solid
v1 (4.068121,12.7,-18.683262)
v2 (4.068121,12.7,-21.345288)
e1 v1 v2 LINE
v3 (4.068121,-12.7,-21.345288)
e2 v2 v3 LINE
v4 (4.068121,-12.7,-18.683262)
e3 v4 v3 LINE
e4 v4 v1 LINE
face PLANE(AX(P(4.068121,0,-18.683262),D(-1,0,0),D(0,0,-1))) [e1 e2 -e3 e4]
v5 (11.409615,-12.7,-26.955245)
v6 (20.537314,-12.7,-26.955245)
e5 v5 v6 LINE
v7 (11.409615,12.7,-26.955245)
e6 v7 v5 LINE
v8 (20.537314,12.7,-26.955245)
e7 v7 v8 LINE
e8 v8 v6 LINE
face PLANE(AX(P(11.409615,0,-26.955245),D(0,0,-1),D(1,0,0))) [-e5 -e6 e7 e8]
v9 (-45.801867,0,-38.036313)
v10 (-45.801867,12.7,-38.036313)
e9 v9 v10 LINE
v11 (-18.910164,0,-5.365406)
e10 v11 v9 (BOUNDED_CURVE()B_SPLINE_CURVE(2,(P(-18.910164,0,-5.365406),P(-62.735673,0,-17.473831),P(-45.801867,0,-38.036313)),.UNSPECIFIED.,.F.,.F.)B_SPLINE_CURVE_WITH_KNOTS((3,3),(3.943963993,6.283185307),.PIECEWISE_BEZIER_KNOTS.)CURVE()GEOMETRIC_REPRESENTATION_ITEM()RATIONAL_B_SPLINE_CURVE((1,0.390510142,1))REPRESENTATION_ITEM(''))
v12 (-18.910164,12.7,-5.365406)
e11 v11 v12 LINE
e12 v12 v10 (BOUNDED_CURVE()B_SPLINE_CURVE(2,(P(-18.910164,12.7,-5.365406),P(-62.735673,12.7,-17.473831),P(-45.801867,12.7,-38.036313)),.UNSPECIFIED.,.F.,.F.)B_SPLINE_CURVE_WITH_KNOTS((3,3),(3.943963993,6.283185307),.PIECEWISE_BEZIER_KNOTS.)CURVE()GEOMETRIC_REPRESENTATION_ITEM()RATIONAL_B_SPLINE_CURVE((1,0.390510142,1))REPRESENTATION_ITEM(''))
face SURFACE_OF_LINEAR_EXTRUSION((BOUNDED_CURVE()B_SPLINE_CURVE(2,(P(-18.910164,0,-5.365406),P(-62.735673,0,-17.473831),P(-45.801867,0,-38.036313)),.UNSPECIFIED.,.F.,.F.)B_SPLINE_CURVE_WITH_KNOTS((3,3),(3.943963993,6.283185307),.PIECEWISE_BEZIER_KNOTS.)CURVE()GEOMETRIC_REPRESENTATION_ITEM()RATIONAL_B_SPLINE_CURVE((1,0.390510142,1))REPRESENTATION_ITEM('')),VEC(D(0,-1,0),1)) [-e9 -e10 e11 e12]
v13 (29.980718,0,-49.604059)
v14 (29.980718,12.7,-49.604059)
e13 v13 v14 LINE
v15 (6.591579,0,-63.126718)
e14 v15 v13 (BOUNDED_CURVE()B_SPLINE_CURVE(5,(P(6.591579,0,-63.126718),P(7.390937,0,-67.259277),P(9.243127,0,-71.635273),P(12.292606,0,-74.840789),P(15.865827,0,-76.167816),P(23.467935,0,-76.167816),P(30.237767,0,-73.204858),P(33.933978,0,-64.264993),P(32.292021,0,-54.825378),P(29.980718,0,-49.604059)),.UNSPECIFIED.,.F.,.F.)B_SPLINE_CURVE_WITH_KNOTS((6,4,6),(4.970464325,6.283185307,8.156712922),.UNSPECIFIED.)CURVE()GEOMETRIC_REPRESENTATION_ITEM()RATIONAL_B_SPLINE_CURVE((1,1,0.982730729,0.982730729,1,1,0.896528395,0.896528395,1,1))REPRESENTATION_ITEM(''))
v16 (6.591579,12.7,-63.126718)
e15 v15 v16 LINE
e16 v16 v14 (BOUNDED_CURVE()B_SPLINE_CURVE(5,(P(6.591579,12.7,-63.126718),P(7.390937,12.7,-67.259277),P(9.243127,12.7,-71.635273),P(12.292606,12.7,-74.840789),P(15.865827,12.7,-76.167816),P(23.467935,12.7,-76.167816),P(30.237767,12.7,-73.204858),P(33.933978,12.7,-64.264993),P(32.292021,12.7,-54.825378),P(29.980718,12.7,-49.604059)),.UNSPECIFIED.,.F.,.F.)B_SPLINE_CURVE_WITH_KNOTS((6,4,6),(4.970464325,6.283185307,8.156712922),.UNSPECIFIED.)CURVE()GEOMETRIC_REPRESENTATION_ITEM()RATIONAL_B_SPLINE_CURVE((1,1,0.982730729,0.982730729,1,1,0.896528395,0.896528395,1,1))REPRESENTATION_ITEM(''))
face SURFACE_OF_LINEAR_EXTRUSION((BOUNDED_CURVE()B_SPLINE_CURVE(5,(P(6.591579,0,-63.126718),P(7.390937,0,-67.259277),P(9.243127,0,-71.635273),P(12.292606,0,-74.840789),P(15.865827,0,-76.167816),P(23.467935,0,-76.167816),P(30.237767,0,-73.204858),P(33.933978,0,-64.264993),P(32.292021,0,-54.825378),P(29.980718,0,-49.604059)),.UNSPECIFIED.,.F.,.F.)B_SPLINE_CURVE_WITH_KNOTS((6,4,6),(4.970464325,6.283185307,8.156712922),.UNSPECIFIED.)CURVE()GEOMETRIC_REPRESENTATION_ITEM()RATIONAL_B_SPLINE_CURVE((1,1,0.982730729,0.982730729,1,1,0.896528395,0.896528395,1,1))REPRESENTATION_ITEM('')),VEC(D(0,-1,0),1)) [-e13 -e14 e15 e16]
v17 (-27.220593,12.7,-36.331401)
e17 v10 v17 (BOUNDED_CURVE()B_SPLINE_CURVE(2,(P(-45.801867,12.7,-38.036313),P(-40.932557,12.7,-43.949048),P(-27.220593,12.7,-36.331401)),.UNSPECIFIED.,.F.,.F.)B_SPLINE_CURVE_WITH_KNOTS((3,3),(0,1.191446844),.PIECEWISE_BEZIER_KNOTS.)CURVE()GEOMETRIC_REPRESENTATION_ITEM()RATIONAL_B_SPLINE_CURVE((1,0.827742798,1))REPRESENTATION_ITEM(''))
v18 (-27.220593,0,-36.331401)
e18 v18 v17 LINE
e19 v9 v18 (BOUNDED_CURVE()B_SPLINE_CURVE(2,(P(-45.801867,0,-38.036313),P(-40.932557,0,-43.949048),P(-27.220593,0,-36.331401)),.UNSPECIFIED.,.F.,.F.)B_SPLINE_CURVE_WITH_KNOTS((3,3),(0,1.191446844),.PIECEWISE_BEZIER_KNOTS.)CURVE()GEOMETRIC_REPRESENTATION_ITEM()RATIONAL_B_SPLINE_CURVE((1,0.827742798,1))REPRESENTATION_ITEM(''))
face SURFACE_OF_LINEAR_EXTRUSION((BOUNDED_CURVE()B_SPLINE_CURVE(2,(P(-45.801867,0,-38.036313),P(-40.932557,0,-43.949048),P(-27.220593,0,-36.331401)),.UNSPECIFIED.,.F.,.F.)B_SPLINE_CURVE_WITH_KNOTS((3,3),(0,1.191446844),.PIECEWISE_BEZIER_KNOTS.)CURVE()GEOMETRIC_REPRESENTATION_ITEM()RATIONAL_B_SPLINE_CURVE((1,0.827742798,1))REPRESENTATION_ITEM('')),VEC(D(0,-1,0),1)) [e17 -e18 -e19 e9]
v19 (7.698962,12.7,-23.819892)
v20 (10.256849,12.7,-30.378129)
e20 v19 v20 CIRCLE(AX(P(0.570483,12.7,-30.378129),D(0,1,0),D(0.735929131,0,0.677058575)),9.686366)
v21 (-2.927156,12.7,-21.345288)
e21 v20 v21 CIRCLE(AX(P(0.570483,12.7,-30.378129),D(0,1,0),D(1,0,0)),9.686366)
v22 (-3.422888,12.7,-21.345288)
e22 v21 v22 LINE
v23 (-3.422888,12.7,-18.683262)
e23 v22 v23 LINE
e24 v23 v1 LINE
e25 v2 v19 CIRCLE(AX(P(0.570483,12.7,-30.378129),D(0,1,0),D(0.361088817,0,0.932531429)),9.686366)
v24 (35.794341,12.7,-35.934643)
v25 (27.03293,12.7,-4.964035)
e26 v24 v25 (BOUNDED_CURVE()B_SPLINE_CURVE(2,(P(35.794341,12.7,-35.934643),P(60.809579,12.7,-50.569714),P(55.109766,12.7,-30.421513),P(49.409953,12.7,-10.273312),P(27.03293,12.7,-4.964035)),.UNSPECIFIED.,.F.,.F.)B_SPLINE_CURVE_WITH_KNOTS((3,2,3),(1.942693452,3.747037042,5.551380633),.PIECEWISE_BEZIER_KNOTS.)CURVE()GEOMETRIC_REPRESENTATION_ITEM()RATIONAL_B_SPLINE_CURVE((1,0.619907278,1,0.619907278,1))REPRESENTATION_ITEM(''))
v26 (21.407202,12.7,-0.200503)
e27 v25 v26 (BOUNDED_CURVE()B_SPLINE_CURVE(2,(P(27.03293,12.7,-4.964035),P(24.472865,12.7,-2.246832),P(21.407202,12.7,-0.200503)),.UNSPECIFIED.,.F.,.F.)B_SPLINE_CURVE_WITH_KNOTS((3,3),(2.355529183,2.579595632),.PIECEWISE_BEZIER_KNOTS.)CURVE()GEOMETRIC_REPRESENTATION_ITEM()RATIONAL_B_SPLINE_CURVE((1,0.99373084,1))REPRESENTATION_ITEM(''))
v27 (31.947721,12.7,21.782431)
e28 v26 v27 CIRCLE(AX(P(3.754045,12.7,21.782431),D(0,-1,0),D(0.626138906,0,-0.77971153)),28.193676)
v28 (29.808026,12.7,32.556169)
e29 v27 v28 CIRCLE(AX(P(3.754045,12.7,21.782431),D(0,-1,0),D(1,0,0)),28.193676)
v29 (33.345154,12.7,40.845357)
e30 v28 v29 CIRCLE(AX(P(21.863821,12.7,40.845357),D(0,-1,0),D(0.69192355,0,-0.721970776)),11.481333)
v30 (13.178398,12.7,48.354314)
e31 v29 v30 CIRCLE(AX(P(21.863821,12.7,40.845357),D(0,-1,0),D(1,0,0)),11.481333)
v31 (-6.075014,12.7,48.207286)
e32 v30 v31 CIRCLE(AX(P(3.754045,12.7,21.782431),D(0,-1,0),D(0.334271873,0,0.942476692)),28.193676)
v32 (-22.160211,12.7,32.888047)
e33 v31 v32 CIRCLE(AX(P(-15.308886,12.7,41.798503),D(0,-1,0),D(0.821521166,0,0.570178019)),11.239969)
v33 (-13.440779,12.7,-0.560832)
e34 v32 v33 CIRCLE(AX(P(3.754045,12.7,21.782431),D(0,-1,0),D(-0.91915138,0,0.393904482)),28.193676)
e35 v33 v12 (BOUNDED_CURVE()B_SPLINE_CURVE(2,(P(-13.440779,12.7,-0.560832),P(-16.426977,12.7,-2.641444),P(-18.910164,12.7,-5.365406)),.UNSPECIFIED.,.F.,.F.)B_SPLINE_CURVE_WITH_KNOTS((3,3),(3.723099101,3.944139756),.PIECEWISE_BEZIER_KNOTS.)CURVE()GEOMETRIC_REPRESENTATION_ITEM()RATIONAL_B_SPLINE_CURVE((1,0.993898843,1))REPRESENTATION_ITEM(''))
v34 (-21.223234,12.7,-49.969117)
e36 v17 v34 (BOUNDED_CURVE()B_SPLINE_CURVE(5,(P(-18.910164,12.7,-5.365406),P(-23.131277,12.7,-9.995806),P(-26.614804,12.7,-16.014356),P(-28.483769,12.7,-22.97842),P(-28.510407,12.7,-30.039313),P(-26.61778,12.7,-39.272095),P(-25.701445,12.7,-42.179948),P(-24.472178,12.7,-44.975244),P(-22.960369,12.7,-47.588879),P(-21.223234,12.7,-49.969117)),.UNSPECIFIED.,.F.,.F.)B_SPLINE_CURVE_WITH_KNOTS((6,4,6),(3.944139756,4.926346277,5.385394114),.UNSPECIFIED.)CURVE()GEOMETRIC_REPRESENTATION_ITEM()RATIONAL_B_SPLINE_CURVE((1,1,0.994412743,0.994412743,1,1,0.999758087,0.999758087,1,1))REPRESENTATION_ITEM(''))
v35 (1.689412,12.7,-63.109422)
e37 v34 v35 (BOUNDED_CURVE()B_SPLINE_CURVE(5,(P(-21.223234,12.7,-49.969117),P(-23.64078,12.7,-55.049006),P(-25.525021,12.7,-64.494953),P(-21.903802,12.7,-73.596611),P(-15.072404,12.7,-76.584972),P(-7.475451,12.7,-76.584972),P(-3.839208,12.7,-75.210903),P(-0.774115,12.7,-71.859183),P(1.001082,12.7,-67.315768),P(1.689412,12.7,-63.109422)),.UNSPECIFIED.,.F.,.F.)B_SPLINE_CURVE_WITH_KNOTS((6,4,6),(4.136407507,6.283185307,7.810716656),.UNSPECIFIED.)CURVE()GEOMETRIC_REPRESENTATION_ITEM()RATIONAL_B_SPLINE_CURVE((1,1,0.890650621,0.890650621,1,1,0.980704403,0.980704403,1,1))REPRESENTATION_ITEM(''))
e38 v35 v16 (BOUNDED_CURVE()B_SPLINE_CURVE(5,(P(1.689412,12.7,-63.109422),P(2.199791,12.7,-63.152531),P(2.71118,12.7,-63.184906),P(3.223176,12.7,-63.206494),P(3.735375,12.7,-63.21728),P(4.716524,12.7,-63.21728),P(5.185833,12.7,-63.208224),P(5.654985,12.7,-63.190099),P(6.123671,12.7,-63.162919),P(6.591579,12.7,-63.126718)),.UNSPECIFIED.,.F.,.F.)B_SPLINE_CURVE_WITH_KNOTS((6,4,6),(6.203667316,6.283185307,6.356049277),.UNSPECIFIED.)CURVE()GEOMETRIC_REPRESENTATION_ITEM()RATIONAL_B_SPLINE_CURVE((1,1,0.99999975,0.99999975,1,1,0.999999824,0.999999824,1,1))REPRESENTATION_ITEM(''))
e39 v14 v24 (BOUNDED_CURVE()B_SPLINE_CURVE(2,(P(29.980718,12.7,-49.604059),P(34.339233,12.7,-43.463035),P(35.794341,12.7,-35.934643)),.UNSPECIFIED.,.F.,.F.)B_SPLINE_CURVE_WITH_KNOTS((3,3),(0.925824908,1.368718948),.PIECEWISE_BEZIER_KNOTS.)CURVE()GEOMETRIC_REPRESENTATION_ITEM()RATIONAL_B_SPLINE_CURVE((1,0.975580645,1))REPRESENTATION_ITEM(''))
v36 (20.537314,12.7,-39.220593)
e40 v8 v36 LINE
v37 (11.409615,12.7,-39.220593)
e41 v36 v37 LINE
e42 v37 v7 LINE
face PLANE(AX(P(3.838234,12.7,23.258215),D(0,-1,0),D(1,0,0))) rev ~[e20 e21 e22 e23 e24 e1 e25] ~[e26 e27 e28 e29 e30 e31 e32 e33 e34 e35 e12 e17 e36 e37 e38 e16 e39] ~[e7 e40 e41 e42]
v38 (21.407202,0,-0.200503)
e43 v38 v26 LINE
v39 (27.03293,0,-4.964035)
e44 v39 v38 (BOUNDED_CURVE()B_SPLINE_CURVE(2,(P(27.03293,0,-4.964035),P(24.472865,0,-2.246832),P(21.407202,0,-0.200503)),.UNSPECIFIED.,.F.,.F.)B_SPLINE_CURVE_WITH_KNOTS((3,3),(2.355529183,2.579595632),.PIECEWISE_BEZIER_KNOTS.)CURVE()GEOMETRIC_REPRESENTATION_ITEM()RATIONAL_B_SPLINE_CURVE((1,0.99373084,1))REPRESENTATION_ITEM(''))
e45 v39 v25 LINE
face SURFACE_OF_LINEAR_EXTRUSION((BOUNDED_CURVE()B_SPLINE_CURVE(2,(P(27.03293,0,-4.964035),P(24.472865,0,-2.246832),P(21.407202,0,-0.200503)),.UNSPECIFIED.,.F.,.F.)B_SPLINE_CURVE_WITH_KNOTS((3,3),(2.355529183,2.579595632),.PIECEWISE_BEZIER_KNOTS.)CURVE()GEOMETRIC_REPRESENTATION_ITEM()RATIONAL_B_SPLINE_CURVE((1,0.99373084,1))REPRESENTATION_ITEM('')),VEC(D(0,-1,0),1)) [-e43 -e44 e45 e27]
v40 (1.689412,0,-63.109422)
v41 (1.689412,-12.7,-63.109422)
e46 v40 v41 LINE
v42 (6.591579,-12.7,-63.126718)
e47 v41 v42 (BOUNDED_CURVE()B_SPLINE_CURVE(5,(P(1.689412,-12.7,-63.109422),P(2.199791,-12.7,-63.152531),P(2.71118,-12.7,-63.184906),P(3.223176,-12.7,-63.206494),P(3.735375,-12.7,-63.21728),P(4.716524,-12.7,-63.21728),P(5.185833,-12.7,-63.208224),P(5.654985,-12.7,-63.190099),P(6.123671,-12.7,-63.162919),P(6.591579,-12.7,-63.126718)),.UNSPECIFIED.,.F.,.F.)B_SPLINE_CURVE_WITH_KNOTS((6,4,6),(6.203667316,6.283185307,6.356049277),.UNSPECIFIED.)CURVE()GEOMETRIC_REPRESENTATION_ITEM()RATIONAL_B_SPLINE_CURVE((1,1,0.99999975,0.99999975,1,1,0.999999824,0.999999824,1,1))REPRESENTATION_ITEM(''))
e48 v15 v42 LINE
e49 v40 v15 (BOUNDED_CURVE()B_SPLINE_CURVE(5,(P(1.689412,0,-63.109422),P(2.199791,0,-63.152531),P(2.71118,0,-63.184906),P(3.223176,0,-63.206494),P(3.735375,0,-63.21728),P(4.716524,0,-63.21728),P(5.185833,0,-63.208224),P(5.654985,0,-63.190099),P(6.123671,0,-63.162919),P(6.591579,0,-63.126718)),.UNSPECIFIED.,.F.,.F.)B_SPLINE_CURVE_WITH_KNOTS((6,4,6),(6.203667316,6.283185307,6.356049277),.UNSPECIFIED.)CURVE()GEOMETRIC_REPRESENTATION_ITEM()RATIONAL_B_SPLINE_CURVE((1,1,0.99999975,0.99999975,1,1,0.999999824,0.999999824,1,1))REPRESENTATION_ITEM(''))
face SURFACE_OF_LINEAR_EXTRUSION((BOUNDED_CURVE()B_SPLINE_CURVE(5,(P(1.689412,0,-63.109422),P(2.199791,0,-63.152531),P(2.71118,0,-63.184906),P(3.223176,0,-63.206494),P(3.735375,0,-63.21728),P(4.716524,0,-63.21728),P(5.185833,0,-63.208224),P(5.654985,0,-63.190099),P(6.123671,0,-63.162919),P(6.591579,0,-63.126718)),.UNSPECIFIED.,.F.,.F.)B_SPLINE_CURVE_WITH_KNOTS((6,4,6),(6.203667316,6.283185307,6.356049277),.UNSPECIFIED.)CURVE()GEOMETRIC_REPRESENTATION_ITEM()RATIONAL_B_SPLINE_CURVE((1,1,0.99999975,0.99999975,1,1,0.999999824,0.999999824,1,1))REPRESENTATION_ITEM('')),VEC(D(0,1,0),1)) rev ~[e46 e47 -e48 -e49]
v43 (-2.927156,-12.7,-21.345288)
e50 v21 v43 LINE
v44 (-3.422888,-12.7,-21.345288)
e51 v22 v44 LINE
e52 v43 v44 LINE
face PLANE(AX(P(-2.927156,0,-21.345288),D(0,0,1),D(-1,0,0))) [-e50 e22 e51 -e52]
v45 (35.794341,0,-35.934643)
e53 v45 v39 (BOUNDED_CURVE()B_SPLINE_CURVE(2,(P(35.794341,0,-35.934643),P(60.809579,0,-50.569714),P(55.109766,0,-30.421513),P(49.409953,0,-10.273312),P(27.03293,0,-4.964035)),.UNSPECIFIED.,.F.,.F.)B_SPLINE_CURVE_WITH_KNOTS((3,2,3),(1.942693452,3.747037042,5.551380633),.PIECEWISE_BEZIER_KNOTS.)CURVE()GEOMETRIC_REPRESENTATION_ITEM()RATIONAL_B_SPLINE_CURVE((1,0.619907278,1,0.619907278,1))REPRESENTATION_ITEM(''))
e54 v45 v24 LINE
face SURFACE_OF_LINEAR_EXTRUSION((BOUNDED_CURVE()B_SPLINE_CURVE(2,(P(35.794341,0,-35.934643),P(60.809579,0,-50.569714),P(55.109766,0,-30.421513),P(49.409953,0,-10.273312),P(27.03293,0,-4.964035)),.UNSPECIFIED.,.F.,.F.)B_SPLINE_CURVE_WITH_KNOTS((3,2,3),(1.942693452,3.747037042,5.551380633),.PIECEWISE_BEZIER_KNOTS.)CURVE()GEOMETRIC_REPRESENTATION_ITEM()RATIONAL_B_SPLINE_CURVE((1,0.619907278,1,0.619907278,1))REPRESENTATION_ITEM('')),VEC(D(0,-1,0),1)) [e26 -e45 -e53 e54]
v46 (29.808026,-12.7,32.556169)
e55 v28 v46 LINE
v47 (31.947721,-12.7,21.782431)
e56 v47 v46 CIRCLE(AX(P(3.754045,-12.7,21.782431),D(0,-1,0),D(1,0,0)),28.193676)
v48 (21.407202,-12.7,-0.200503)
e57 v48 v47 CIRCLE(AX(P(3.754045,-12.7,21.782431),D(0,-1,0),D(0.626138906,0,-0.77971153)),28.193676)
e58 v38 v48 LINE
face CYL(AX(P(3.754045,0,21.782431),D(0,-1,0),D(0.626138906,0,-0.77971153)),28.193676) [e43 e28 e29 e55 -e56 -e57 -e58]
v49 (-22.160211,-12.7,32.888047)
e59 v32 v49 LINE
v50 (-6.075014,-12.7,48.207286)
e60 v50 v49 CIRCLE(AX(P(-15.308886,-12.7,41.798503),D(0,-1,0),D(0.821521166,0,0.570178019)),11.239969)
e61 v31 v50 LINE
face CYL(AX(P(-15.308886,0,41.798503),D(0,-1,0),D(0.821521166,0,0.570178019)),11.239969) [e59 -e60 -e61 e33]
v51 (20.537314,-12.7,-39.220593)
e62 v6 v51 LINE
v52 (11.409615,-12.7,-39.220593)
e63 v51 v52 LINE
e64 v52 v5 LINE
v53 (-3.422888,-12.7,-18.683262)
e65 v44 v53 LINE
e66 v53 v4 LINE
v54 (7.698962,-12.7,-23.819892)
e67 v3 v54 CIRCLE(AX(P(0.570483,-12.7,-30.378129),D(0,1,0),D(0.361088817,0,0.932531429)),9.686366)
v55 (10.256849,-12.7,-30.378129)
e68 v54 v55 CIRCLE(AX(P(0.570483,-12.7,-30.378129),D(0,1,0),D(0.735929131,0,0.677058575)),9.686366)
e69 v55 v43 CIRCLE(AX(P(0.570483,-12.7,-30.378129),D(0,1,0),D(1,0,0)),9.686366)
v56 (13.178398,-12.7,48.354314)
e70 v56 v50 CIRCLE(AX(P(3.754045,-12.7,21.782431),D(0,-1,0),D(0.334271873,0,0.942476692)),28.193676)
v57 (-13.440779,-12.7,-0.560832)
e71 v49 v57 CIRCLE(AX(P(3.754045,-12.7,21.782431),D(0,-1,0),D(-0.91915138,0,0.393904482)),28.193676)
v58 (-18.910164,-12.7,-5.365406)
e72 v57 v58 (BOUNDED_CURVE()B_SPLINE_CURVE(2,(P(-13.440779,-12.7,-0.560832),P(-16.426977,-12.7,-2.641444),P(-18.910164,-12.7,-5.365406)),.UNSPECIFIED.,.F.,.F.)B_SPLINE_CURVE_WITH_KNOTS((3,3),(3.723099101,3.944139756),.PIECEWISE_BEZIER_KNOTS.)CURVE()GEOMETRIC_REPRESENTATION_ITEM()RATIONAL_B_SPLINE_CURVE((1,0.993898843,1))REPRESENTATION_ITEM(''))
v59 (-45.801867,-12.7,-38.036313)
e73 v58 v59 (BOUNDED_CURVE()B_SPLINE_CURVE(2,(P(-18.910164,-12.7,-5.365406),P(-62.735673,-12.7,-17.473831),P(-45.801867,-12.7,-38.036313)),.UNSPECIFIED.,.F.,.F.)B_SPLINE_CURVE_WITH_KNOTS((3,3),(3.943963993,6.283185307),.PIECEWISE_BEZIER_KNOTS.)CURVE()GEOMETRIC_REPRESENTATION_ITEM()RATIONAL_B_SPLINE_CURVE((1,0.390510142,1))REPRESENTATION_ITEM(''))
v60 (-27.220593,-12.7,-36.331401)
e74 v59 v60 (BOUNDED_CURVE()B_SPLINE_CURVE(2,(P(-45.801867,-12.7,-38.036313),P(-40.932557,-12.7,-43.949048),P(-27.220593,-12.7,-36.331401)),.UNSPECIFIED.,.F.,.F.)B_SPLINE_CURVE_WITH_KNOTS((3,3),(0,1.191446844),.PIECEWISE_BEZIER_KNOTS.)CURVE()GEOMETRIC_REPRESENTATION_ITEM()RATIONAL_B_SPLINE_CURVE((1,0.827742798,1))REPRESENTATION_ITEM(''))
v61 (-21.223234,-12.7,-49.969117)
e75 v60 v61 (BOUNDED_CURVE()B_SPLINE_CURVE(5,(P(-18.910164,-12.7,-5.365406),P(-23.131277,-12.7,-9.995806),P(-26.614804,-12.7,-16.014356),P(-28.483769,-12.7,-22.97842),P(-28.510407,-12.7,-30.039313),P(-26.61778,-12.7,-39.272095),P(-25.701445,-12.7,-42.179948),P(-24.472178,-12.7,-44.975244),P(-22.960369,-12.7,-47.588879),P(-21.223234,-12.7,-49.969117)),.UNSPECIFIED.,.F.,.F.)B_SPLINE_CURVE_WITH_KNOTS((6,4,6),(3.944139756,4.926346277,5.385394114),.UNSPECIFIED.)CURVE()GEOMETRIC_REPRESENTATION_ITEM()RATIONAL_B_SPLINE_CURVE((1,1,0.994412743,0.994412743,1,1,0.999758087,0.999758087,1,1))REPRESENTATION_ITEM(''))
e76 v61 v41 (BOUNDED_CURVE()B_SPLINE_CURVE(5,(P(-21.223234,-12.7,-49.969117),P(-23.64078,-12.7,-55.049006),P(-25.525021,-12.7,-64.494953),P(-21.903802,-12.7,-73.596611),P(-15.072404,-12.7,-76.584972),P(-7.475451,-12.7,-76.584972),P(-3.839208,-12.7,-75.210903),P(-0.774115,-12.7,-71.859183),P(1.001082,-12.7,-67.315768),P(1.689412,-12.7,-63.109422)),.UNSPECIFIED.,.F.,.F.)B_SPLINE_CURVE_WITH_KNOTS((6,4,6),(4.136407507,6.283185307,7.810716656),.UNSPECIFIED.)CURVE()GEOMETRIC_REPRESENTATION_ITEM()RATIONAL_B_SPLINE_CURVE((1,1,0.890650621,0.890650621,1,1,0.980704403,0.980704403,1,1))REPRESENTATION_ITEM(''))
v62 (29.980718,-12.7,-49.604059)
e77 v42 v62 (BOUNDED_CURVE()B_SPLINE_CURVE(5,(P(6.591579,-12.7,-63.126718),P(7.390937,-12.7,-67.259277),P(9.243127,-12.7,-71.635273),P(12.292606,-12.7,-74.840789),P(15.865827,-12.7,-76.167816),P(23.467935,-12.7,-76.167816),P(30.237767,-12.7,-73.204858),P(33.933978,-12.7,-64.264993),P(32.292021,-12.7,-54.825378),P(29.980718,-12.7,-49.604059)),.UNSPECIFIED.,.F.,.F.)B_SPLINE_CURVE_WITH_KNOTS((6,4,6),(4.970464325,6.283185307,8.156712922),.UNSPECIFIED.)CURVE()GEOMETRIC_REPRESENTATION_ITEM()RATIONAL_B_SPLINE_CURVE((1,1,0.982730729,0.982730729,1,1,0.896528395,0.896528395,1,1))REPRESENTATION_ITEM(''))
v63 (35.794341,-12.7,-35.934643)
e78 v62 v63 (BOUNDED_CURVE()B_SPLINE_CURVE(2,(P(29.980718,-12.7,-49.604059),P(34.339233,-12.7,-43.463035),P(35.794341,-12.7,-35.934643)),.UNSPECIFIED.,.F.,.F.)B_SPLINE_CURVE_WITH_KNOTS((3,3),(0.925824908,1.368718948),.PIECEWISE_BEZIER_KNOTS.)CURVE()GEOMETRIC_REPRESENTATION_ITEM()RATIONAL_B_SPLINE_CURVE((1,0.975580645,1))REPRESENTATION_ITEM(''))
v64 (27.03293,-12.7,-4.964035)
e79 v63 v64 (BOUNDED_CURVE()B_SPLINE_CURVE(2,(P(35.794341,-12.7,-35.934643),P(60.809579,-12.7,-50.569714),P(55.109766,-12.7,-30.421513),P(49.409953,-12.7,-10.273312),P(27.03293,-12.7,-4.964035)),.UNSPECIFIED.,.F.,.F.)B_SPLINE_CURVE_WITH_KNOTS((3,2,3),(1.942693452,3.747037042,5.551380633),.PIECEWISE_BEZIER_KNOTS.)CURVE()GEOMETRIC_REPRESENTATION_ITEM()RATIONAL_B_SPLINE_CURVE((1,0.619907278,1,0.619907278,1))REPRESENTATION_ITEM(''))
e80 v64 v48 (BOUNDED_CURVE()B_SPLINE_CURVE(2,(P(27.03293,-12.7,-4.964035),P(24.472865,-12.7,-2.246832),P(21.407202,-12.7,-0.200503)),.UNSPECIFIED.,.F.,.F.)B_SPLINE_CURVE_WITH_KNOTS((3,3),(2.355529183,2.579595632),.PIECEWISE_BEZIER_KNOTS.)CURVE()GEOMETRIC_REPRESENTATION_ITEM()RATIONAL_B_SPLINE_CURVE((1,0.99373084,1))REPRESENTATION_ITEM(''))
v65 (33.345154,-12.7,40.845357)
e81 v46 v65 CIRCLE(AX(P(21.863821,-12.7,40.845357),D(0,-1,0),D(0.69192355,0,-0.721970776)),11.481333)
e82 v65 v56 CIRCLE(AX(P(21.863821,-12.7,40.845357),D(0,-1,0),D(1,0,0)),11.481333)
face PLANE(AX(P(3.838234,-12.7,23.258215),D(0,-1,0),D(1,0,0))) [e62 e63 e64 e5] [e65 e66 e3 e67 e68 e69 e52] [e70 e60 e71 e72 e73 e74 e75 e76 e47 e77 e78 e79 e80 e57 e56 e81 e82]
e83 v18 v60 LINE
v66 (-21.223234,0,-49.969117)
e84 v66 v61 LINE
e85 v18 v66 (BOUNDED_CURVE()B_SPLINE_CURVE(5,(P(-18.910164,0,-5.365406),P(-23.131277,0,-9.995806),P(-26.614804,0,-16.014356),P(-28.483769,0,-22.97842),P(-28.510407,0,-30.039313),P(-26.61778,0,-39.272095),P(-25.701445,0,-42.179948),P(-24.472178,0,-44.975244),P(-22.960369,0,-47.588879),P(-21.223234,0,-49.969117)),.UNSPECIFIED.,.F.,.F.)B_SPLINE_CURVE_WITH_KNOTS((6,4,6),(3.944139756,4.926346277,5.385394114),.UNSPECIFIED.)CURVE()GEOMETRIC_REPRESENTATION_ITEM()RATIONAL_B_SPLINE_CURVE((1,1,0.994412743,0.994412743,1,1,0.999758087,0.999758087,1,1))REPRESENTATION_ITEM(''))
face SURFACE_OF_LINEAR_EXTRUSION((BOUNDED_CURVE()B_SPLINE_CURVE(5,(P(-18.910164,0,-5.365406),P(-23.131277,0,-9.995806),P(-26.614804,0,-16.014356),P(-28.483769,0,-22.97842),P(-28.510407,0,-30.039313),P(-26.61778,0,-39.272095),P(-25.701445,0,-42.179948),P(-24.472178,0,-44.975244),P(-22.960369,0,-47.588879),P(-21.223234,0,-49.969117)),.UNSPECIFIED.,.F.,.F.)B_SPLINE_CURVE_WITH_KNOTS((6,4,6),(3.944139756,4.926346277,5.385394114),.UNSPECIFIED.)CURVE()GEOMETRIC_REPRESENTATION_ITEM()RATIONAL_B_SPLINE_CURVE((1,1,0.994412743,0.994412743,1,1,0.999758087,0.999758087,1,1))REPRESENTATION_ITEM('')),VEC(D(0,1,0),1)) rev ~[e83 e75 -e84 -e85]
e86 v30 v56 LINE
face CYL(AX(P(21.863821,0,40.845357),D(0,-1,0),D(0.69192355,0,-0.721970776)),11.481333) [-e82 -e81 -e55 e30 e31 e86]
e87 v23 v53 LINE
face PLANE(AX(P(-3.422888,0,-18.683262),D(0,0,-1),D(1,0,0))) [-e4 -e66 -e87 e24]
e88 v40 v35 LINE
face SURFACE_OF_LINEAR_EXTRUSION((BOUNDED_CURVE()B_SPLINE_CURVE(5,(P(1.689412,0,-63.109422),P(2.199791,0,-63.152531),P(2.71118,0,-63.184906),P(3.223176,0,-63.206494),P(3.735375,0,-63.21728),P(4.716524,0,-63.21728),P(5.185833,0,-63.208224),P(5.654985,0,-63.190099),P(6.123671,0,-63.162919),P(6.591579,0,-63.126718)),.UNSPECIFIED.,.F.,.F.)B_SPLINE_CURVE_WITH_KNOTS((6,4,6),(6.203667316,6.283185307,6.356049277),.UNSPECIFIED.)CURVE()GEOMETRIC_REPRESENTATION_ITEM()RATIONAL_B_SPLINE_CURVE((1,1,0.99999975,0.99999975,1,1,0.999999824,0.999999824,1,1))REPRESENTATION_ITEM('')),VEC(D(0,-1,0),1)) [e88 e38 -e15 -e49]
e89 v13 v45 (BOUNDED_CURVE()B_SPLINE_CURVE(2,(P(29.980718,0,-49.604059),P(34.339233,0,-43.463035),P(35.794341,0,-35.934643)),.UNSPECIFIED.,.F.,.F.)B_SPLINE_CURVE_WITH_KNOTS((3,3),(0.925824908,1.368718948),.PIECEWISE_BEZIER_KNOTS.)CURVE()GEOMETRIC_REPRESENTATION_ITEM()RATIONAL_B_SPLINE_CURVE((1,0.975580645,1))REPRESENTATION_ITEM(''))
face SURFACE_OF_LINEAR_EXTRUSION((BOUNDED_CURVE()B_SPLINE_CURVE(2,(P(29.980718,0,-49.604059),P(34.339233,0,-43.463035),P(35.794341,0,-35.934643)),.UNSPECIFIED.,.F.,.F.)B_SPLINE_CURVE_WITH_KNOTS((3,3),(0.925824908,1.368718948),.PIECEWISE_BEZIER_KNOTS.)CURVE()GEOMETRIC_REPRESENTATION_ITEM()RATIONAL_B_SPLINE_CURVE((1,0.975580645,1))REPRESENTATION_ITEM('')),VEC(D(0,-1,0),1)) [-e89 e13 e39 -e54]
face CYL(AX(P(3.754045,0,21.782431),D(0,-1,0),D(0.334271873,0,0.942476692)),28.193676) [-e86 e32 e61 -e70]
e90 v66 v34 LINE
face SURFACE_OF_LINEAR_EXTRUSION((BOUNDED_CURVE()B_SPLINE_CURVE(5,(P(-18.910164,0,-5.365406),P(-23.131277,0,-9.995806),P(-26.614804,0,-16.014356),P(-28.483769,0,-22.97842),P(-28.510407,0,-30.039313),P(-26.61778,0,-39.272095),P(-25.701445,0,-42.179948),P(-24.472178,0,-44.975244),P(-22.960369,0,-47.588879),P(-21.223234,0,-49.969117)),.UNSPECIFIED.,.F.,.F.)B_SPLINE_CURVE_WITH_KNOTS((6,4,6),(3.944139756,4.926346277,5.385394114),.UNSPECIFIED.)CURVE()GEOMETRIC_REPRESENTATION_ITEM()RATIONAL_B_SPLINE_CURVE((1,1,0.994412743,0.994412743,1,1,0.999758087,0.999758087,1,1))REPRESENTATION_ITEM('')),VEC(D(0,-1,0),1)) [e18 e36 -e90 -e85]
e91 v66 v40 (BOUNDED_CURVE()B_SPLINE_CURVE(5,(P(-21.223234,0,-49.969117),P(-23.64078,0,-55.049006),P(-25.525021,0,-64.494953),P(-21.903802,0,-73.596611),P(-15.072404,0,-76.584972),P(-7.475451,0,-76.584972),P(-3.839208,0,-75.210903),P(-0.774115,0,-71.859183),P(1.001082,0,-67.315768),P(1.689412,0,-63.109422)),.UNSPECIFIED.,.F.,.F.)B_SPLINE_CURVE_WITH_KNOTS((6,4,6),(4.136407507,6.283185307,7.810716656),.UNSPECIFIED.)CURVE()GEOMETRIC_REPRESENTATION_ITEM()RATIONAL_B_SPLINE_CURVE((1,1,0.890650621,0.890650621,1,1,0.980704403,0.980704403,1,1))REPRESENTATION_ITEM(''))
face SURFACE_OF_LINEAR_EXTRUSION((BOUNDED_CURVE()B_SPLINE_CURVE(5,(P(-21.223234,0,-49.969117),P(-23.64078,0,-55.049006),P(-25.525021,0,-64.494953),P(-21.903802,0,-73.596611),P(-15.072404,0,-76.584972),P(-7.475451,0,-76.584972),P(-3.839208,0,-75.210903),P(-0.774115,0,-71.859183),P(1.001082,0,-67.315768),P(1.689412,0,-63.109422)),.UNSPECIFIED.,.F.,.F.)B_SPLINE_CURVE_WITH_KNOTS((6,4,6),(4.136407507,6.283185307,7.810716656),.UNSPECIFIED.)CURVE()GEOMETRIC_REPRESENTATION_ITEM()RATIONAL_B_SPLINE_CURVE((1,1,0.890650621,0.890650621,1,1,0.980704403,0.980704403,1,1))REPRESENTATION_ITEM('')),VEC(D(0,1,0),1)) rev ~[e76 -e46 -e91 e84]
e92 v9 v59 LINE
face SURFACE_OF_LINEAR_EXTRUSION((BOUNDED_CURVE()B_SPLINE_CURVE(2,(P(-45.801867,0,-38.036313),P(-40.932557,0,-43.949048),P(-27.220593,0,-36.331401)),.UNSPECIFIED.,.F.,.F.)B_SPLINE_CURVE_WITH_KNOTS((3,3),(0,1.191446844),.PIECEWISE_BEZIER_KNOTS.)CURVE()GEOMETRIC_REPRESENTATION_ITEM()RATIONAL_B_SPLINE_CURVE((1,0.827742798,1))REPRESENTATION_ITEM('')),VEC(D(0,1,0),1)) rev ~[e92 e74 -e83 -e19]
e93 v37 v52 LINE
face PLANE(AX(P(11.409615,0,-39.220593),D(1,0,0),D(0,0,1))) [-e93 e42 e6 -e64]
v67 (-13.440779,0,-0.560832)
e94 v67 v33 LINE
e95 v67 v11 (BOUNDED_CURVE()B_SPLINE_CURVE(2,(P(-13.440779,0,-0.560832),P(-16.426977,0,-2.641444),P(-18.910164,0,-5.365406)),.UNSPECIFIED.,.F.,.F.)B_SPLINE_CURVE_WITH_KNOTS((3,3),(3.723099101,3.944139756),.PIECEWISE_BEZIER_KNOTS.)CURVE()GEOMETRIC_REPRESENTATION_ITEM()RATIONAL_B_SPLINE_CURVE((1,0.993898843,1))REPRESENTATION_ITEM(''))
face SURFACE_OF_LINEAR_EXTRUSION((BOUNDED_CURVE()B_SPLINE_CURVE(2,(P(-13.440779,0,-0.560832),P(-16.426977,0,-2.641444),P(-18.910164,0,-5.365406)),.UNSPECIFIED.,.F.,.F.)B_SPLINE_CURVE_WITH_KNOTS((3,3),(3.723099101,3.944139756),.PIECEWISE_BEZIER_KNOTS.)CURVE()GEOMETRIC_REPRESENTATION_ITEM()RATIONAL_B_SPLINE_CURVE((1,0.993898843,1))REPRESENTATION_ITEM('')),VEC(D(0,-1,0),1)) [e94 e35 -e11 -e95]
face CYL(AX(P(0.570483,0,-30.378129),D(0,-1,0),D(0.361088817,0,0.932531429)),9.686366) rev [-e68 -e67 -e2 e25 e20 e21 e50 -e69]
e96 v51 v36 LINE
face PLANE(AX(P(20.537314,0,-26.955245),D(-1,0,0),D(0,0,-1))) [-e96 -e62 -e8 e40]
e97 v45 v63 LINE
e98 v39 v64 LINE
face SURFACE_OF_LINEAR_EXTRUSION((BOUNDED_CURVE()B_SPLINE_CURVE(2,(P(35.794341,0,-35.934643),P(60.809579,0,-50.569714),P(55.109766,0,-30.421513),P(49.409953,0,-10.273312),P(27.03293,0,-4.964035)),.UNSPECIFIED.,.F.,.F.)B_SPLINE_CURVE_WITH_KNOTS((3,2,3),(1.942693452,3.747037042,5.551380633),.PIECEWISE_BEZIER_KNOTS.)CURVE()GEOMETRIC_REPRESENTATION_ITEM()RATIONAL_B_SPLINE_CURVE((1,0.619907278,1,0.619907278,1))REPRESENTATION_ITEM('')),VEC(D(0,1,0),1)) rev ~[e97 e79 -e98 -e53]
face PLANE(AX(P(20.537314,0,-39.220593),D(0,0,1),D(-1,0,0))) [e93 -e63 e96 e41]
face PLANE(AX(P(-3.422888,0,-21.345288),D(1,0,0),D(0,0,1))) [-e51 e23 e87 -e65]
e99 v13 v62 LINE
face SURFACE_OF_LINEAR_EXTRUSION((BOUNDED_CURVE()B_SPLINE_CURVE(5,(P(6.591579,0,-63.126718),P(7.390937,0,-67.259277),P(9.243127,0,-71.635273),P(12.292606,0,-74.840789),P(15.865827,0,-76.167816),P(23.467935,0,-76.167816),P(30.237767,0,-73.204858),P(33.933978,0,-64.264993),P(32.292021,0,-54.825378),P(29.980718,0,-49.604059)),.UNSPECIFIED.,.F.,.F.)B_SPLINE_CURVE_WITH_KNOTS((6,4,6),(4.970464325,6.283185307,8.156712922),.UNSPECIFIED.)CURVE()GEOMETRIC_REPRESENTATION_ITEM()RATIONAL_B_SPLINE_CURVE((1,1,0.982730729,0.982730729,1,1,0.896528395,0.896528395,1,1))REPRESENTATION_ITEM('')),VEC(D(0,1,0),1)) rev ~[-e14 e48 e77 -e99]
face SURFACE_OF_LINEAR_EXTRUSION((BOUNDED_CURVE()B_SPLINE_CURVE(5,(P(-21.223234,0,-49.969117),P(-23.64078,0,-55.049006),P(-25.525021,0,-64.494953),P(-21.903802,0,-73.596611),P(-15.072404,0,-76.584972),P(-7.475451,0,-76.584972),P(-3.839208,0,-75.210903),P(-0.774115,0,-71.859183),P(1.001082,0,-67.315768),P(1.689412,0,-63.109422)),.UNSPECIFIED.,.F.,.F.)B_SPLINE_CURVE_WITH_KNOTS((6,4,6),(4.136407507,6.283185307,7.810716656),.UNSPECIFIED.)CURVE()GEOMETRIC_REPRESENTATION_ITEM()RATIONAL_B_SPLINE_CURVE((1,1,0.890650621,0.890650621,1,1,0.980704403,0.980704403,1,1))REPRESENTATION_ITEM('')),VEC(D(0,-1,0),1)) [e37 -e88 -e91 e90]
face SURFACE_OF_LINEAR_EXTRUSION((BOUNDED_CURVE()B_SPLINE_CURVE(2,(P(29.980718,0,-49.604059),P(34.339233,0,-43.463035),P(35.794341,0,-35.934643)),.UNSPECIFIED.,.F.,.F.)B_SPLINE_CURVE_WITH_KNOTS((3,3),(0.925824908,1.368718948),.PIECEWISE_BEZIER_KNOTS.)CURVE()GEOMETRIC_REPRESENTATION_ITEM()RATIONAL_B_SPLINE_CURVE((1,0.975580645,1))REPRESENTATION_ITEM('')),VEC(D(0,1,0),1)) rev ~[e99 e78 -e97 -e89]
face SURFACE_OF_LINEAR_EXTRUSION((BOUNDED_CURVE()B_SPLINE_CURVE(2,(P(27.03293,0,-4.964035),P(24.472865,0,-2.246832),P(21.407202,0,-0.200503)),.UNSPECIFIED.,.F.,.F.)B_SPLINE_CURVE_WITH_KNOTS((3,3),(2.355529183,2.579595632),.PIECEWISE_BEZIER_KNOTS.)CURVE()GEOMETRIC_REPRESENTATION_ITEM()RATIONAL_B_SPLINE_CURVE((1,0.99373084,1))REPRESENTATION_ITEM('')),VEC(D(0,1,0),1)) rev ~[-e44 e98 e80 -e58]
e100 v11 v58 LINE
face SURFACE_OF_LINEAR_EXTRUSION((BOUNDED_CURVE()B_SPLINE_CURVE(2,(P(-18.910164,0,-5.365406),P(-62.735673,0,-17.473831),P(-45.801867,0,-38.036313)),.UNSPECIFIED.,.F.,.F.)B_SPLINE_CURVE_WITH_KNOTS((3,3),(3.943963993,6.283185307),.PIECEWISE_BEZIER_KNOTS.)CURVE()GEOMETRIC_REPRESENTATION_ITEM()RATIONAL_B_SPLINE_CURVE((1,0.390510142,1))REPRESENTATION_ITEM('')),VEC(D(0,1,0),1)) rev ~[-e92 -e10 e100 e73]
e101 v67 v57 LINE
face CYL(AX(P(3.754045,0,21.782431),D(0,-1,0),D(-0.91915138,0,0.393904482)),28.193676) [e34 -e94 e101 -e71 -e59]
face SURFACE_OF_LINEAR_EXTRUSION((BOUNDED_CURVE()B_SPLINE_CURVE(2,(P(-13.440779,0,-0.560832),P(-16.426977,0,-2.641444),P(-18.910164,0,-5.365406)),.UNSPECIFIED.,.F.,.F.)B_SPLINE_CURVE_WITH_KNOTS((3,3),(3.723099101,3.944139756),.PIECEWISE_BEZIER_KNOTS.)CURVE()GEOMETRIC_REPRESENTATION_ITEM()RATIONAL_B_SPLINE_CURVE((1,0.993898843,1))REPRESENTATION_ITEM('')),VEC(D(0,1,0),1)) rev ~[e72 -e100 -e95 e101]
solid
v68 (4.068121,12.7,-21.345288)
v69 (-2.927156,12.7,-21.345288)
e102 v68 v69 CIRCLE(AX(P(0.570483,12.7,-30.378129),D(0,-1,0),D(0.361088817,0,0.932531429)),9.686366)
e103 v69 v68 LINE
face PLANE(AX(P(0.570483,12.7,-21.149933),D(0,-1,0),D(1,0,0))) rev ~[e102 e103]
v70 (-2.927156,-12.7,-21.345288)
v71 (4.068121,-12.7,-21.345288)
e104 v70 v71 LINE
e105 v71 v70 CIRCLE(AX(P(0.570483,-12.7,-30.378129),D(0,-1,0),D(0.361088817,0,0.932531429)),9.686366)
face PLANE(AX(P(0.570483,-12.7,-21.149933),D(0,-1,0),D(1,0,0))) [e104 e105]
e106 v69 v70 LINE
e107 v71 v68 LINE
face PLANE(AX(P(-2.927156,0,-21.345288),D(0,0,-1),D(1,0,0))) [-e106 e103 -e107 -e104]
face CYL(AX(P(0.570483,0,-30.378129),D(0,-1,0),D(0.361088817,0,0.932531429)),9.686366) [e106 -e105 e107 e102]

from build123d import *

# Parameters (mm, degrees)
F1_DEPTH = 12.7


with BuildPart() as f1:
    # F0 (on Front) → F1 (new body, symmetric)
    with BuildSketch(Plane.XZ):
        with BuildLine():
            ThreePointArc((21.4072020605, -0.2005026234), (29.1763847833, 9.5927644936), (31.9477205013, 21.7824314022))
            ThreePointArc((31.9477205013, 21.7824314022), (31.407623557, 27.2745103789), (29.808025642, 32.5561694654))
            ThreePointArc((29.808025642, 32.5561694654), (13.9560593574, 32.5213958074), (13.178397571, 48.3543136194))
            ThreePointArc((13.178397571, 48.3543136194), (3.538752003, 49.9752850855), (-6.075013926, 48.2072862636))
            ThreePointArc((-6.075013926, 48.2072862636), (-4.5821594527, 45.1562153753), (-4.0689174459, 41.7985032545))
            ThreePointArc((-4.0689174459, 41.7985032545), (-10.3425888827, 31.7152108279), (-22.1602111332, 32.8880466238))
            ThreePointArc((-22.1602111332, 32.8880466238), (-23.5279097172, 14.6705886204), (-13.4407785602, -0.5608315546))
            add(Edge.make_bspline(
                [(21.4072020605, -0.2005026234), (3.8738448753, 11.5030083296), (-13.4407785602, -0.5608315546)],
                knots=[2.5795956317, 2.5795956317, 2.5795956317, 3.7230991014, 3.7230991014, 3.7230991014], degree=2, weights=[1, 0.8409543917, 1]))
        make_face()
        with BuildLine():
            ThreePointArc((13.178397571, 48.3543136194), (13.9560593574, 32.5213958074), (29.808025642, 32.5561694654))
            ThreePointArc((29.808025642, 32.5561694654), (23.1724221434, 42.2228318625), (13.178397571, 48.3543136194))
        make_face()
        with BuildLine():
            ThreePointArc((13.178397571, 48.3543136194), (23.1724221434, 42.2228318625), (29.808025642, 32.5561694654))
            ThreePointArc((29.808025642, 32.5561694654), (32.423912555, 36.3391968743), (33.3451540291, 40.8453565324))
            ThreePointArc((33.3451540291, 40.8453565324), (25.8701142557, 51.6050324403), (13.178397571, 48.3543136194))
        make_face()
        with BuildLine():
            add(Edge.make_bspline(
                [(27.032929556, -4.9640346513), (24.47286462, -2.2468315132), (21.4072020605, -0.2005026234)],
                knots=[2.3555291834, 2.3555291834, 2.3555291834, 2.5795956317, 2.5795956317, 2.5795956317], degree=2, weights=[1, 0.9937308397, 1]))
            ThreePointArc((21.4072020605, -0.2005026234), (4.045552476, -6.4097372456), (-13.4407785602, -0.5608315546))
            add(Edge.make_bspline(
                [(-13.4407785602, -0.5608315546), (-16.4269767093, -2.64144373), (-18.9101642422, -5.3654058694)],
                knots=[3.7230991014, 3.7230991014, 3.7230991014, 3.9441397555, 3.9441397555, 3.9441397555], degree=2, weights=[1, 0.9938988428, 1]))
            add(Edge.make_bspline(
                [(-27.220592602, -36.3314006709), (-10.5893694739, -27.0919670095), (-7.1072871664, -14.1171674007), (-3.6252048589, -1.1423677919), (-18.9101642422, -5.3654058694)],
                knots=[1.1914468438, 1.1914468438, 1.1914468438, 2.5677054181, 2.5677054181, 3.9439639925, 3.9439639925, 3.9439639925], degree=2, weights=[1, 0.7724354431, 1, 0.7724354431, 1]))
            add(Edge.make_bspline(
                [(-27.220592602, -36.3314006709), (-25.6755646838, -43.8684917338), (-21.223233788, -49.9691174456)],
                knots=[4.9263462771, 4.9263462771, 4.9263462771, 5.3708124747, 5.3708124747, 5.3708124747], degree=2, weights=[1, 0.9754076882, 1]))
            add(Edge.make_bspline(
                [(1.6894122595, -63.1094222428), (3.990089745, -49.0501097367), (-5.7417760212, -43.4689262213), (-15.4736417874, -37.887742706), (-21.223233788, -49.9691174456)],
                knots=[1.3510901139, 1.3510901139, 1.3510901139, 2.7437488102, 2.7437488102, 4.1364075066, 4.1364075066, 4.1364075066], degree=2, weights=[1, 0.7672017282, 1, 0.7672017282, 1]))
            add(Edge.make_bspline(
                [(1.6894122595, -63.1094222428), (2.9663677621, -63.2172799366), (4.2473710941, -63.2172799366)],
                knots=[6.2036673158, 6.2036673158, 6.2036673158, 6.2831853072, 6.2831853072, 6.2831853072], degree=2, weights=[1, 0.9992097152, 1]))
            add(Edge.make_bspline(
                [(4.2473710941, -63.2172799366), (5.4210318652, -63.2172799366), (6.5915787023, -63.1267179419)],
                knots=[0, 0, 0, 0.0728608894, 0.0728608894, 0.0728608894], degree=2, weights=[1, 0.9993364847, 1]))
            add(Edge.make_bspline(
                [(29.9807177647, -49.6040588443), (24.2311078692, -36.6154787146), (13.9923485543, -42.5351173737), (3.7535892394, -48.4547560328), (6.5915787023, -63.1267179419)],
                knots=[2.1142110715, 2.1142110715, 2.1142110715, 3.5423376984, 3.5423376984, 4.9704643252, 4.9704643252, 4.9704643252], degree=2, weights=[1, 0.7557070179, 1, 0.7557070179, 1]))
            add(Edge.make_bspline(
                [(29.9807177647, -49.6040588443), (34.3392330374, -43.4630345178), (35.7943407329, -35.9346430319)],
                knots=[0.9258249083, 0.9258249083, 0.9258249083, 1.3687189484, 1.3687189484, 1.3687189484], degree=2, weights=[1, 0.9755806451, 1]))
            add(Edge.make_bspline(
                [(17.4818759947, -6.6058057692), (6.8734541188, -19.0145870238), (35.7943407329, -35.9346430319)],
                knots=[0, 0, 0, 1.9426934521, 1.9426934521, 1.9426934521], degree=2, weights=[1, 0.5641881238, 1]))
            add(Edge.make_bspline(
                [(27.032929556, -4.9640346513), (20.2593941608, -3.356913921), (17.4818759947, -6.6058057692)],
                knots=[5.5513806327, 5.5513806327, 5.5513806327, 6.2831853072, 6.2831853072, 6.2831853072], degree=2, weights=[1, 0.9338012923, 1]))
        make_face()
        with BuildLine():
            ThreePointArc((7.6989617268, -23.8198920655), (9.594748521, -26.8584254178), (10.2568488529, -30.3781293333))
            ThreePointArc((10.2568488529, -30.3781293333), (-4.9042904668, -38.3689082877), (-2.9271558048, -21.3452884523))
            Line((-2.9271558048, -21.3452884523), (-3.4228879958, -21.3452884523))
            Line((-3.4228879958, -21.3452884523), (-3.4228879958, -18.6832621694))
            Line((-3.4228879958, -18.6832621694), (0, -18.6832621694))
            Line((0, -18.6832621694), (4.0681211865, -18.6832621694))
            Line((4.0681211865, -18.6832621694), (4.0681211865, -21.3452884523))
            ThreePointArc((4.0681211865, -21.3452884523), (6.0257103863, -22.3739941384), (7.6989617268, -23.8198920655))
        make_face(mode=Mode.SUBTRACT)
        Polygon((11.4096151665, -39.2205929384), (11.4096151665, -26.9552450627), (15.9734645858, -26.9552450627), (20.5373140052, -26.9552450627), (20.5373140052, -39.2205929384), align=None, mode=Mode.SUBTRACT)
        with BuildLine():
            ThreePointArc((-13.4407785602, -0.5608315546), (4.045552476, -6.4097372456), (21.4072020605, -0.2005026234))
            add(Edge.make_bspline(
                [(21.4072020605, -0.2005026234), (3.8738448753, 11.5030083296), (-13.4407785602, -0.5608315546)],
                knots=[2.5795956317, 2.5795956317, 2.5795956317, 3.7230991014, 3.7230991014, 3.7230991014], degree=2, weights=[1, 0.8409543917, 1]))
        make_face()
        with BuildLine():
            add(Edge.make_bspline(
                [(35.7943407329, -35.9346430319), (60.8095787908, -50.5697140325), (55.1097658811, -30.4215130287), (49.4099529714, -10.2733120249), (27.032929556, -4.9640346513)],
                knots=[1.9426934521, 1.9426934521, 1.9426934521, 3.7470370424, 3.7470370424, 5.5513806327, 5.5513806327, 5.5513806327], degree=2, weights=[1, 0.619907278, 1, 0.619907278, 1]))
            add(Edge.make_bspline(
                [(35.7943407329, -35.9346430319), (39.2700257665, -17.9522505972), (27.032929556, -4.9640346513)],
                knots=[1.3687189484, 1.3687189484, 1.3687189484, 2.3555291834, 2.3555291834, 2.3555291834], degree=2, weights=[1, 0.88072521, 1]))
        make_face()
        with BuildLine():
            add(Edge.make_bspline(
                [(35.7943407329, -35.9346430319), (39.2700257665, -17.9522505972), (27.032929556, -4.9640346513)],
                knots=[1.3687189484, 1.3687189484, 1.3687189484, 2.3555291834, 2.3555291834, 2.3555291834], degree=2, weights=[1, 0.88072521, 1]))
            add(Edge.make_bspline(
                [(27.032929556, -4.9640346513), (20.2593941608, -3.356913921), (17.4818759947, -6.6058057692)],
                knots=[5.5513806327, 5.5513806327, 5.5513806327, 6.2831853072, 6.2831853072, 6.2831853072], degree=2, weights=[1, 0.9338012923, 1]))
            add(Edge.make_bspline(
                [(17.4818759947, -6.6058057692), (6.8734541188, -19.0145870238), (35.7943407329, -35.9346430319)],
                knots=[0, 0, 0, 1.9426934521, 1.9426934521, 1.9426934521], degree=2, weights=[1, 0.5641881238, 1]))
        make_face()
        with BuildLine():
            ThreePointArc((-4.0689174459, 41.7985032545), (-4.5821594527, 45.1562153753), (-6.075013926, 48.2072862636))
            ThreePointArc((-6.075013926, 48.2072862636), (-15.6898722823, 42.198538731), (-22.1602111332, 32.8880466238))
            ThreePointArc((-22.1602111332, 32.8880466238), (-10.3425888827, 31.7152108279), (-4.0689174459, 41.7985032545))
        make_face()
        with BuildLine():
            ThreePointArc((-22.1602111332, 32.8880466238), (-15.6898722823, 42.198538731), (-6.075013926, 48.2072862636))
            ThreePointArc((-6.075013926, 48.2072862636), (-23.0605895831, 49.9377897728), (-22.1602111332, 32.8880466238))
        make_face()
        with BuildLine():
            add(Edge.make_bspline(
                [(-27.220592602, -36.3314006709), (-10.5893694739, -27.0919670095), (-7.1072871664, -14.1171674007), (-3.6252048589, -1.1423677919), (-18.9101642422, -5.3654058694)],
                knots=[1.1914468438, 1.1914468438, 1.1914468438, 2.5677054181, 2.5677054181, 3.9439639925, 3.9439639925, 3.9439639925], degree=2, weights=[1, 0.7724354431, 1, 0.7724354431, 1]))
            add(Edge.make_bspline(
                [(-18.9101642422, -5.3654058694), (-30.8773052041, -18.492903678), (-27.220592602, -36.3314006709)],
                knots=[3.9441397555, 3.9441397555, 3.9441397555, 4.9263462771, 4.9263462771, 4.9263462771], degree=2, weights=[1, 0.8818130986, 1]))
        make_face()
        with BuildLine():
            add(Edge.make_bspline(
                [(-18.9101642422, -5.3654058694), (-30.8773052041, -18.492903678), (-27.220592602, -36.3314006709)],
                knots=[3.9441397555, 3.9441397555, 3.9441397555, 4.9263462771, 4.9263462771, 4.9263462771], degree=2, weights=[1, 0.8818130986, 1]))
            add(Edge.make_bspline(
                [(-18.9101642422, -5.3654058694), (-62.7356726046, -17.473831279), (-45.8018668681, -38.0363134591)],
                knots=[3.9439639925, 3.9439639925, 3.9439639925, 6.2831853072, 6.2831853072, 6.2831853072], degree=2, weights=[1, 0.3905101422, 1]))
            add(Edge.make_bspline(
                [(-45.8018668681, -38.0363134591), (-40.9325572153, -43.9490476976), (-27.220592602, -36.3314006709)],
                knots=[0, 0, 0, 1.1914468438, 1.1914468438, 1.1914468438], degree=2, weights=[1, 0.8277427979, 1]))
        make_face()
        with BuildLine():
            add(Edge.make_bspline(
                [(18.9978633271, -76.1678158343), (41.7396043038, -76.1678158343), (29.9807177647, -49.6040588443)],
                knots=[0, 0, 0, 2.1142110715, 2.1142110715, 2.1142110715], degree=2, weights=[1, 0.4913950322, 1]))
            add(Edge.make_bspline(
                [(6.5915787023, -63.1267179419), (21.1844822405, -61.9977050648), (29.9807177647, -49.6040588443)],
                knots=[0.0728608894, 0.0728608894, 0.0728608894, 0.9258249083, 0.9258249083, 0.9258249083], degree=2, weights=[1, 0.9104266694, 1]))
            add(Edge.make_bspline(
                [(6.5915787023, -63.1267179419), (9.114111042, -76.1678158343), (18.9978633271, -76.1678158343)],
                knots=[4.9704643252, 4.9704643252, 4.9704643252, 6.2831853072, 6.2831853072, 6.2831853072], degree=2, weights=[1, 0.7922184388, 1]))
        make_face()
        with BuildLine():
            add(Edge.make_bspline(
                [(6.5915787023, -63.1267179419), (21.1844822405, -61.9977050648), (29.9807177647, -49.6040588443)],
                knots=[0.0728608894, 0.0728608894, 0.0728608894, 0.9258249083, 0.9258249083, 0.9258249083], degree=2, weights=[1, 0.9104266694, 1]))
            add(Edge.make_bspline(
                [(29.9807177647, -49.6040588443), (24.2311078692, -36.6154787146), (13.9923485543, -42.5351173737), (3.7535892394, -48.4547560328), (6.5915787023, -63.1267179419)],
                knots=[2.1142110715, 2.1142110715, 2.1142110715, 3.5423376984, 3.5423376984, 4.9704643252, 4.9704643252, 4.9704643252], degree=2, weights=[1, 0.7557070179, 1, 0.7557070179, 1]))
        make_face()
        with BuildLine():
            add(Edge.make_bspline(
                [(1.6894122595, -63.1094222428), (3.990089745, -49.0501097367), (-5.7417760212, -43.4689262213), (-15.4736417874, -37.887742706), (-21.223233788, -49.9691174456)],
                knots=[1.3510901139, 1.3510901139, 1.3510901139, 2.7437488102, 2.7437488102, 4.1364075066, 4.1364075066, 4.1364075066], degree=2, weights=[1, 0.7672017282, 1, 0.7672017282, 1]))
            add(Edge.make_bspline(
                [(-21.223233788, -49.9691174456), (-12.5084441764, -61.9102042206), (1.6894122595, -63.1094222428)],
                knots=[5.3708124747, 5.3708124747, 5.3708124747, 6.2036673158, 6.2036673158, 6.2036673158], degree=2, weights=[1, 0.9145398668, 1]))
        make_face()
        with BuildLine():
            add(Edge.make_bspline(
                [(-21.223233788, -49.9691174456), (-12.5084441764, -61.9102042206), (1.6894122595, -63.1094222428)],
                knots=[5.3708124747, 5.3708124747, 5.3708124747, 6.2036673158, 6.2036673158, 6.2036673158], degree=2, weights=[1, 0.9145398668, 1]))
            add(Edge.make_bspline(
                [(-21.223233788, -49.9691174456), (-33.8898636884, -76.5849716658), (-10.6337546143, -76.5849716658)],
                knots=[4.1364075066, 4.1364075066, 4.1364075066, 6.2831853072, 6.2831853072, 6.2831853072], degree=2, weights=[1, 0.4771487326, 1]))
            add(Edge.make_bspline(
                [(-10.6337546143, -76.5849716658), (-0.5157377539, -76.5849716658), (1.6894122595, -63.1094222428)],
                knots=[0, 0, 0, 1.3510901139, 1.3510901139, 1.3510901139], degree=2, weights=[1, 0.7803662306, 1]))
        make_face()
    extrude(amount=F1_DEPTH, both=True)


with BuildPart() as f1b:
    # F0 (on Front) → F1, piece 2 (new body, symmetric)
    with BuildSketch(Plane.XZ):
        with BuildLine():
            ThreePointArc((4.0681211865, -21.3452884523), (0.5704826908, -20.6917631711), (-2.9271558048, -21.3452884523))
            Line((-2.9271558048, -21.3452884523), (4.0681211865, -21.3452884523))
        make_face()
    extrude(amount=F1_DEPTH, both=True)


solid = Compound([f1.part, f1b.part])
